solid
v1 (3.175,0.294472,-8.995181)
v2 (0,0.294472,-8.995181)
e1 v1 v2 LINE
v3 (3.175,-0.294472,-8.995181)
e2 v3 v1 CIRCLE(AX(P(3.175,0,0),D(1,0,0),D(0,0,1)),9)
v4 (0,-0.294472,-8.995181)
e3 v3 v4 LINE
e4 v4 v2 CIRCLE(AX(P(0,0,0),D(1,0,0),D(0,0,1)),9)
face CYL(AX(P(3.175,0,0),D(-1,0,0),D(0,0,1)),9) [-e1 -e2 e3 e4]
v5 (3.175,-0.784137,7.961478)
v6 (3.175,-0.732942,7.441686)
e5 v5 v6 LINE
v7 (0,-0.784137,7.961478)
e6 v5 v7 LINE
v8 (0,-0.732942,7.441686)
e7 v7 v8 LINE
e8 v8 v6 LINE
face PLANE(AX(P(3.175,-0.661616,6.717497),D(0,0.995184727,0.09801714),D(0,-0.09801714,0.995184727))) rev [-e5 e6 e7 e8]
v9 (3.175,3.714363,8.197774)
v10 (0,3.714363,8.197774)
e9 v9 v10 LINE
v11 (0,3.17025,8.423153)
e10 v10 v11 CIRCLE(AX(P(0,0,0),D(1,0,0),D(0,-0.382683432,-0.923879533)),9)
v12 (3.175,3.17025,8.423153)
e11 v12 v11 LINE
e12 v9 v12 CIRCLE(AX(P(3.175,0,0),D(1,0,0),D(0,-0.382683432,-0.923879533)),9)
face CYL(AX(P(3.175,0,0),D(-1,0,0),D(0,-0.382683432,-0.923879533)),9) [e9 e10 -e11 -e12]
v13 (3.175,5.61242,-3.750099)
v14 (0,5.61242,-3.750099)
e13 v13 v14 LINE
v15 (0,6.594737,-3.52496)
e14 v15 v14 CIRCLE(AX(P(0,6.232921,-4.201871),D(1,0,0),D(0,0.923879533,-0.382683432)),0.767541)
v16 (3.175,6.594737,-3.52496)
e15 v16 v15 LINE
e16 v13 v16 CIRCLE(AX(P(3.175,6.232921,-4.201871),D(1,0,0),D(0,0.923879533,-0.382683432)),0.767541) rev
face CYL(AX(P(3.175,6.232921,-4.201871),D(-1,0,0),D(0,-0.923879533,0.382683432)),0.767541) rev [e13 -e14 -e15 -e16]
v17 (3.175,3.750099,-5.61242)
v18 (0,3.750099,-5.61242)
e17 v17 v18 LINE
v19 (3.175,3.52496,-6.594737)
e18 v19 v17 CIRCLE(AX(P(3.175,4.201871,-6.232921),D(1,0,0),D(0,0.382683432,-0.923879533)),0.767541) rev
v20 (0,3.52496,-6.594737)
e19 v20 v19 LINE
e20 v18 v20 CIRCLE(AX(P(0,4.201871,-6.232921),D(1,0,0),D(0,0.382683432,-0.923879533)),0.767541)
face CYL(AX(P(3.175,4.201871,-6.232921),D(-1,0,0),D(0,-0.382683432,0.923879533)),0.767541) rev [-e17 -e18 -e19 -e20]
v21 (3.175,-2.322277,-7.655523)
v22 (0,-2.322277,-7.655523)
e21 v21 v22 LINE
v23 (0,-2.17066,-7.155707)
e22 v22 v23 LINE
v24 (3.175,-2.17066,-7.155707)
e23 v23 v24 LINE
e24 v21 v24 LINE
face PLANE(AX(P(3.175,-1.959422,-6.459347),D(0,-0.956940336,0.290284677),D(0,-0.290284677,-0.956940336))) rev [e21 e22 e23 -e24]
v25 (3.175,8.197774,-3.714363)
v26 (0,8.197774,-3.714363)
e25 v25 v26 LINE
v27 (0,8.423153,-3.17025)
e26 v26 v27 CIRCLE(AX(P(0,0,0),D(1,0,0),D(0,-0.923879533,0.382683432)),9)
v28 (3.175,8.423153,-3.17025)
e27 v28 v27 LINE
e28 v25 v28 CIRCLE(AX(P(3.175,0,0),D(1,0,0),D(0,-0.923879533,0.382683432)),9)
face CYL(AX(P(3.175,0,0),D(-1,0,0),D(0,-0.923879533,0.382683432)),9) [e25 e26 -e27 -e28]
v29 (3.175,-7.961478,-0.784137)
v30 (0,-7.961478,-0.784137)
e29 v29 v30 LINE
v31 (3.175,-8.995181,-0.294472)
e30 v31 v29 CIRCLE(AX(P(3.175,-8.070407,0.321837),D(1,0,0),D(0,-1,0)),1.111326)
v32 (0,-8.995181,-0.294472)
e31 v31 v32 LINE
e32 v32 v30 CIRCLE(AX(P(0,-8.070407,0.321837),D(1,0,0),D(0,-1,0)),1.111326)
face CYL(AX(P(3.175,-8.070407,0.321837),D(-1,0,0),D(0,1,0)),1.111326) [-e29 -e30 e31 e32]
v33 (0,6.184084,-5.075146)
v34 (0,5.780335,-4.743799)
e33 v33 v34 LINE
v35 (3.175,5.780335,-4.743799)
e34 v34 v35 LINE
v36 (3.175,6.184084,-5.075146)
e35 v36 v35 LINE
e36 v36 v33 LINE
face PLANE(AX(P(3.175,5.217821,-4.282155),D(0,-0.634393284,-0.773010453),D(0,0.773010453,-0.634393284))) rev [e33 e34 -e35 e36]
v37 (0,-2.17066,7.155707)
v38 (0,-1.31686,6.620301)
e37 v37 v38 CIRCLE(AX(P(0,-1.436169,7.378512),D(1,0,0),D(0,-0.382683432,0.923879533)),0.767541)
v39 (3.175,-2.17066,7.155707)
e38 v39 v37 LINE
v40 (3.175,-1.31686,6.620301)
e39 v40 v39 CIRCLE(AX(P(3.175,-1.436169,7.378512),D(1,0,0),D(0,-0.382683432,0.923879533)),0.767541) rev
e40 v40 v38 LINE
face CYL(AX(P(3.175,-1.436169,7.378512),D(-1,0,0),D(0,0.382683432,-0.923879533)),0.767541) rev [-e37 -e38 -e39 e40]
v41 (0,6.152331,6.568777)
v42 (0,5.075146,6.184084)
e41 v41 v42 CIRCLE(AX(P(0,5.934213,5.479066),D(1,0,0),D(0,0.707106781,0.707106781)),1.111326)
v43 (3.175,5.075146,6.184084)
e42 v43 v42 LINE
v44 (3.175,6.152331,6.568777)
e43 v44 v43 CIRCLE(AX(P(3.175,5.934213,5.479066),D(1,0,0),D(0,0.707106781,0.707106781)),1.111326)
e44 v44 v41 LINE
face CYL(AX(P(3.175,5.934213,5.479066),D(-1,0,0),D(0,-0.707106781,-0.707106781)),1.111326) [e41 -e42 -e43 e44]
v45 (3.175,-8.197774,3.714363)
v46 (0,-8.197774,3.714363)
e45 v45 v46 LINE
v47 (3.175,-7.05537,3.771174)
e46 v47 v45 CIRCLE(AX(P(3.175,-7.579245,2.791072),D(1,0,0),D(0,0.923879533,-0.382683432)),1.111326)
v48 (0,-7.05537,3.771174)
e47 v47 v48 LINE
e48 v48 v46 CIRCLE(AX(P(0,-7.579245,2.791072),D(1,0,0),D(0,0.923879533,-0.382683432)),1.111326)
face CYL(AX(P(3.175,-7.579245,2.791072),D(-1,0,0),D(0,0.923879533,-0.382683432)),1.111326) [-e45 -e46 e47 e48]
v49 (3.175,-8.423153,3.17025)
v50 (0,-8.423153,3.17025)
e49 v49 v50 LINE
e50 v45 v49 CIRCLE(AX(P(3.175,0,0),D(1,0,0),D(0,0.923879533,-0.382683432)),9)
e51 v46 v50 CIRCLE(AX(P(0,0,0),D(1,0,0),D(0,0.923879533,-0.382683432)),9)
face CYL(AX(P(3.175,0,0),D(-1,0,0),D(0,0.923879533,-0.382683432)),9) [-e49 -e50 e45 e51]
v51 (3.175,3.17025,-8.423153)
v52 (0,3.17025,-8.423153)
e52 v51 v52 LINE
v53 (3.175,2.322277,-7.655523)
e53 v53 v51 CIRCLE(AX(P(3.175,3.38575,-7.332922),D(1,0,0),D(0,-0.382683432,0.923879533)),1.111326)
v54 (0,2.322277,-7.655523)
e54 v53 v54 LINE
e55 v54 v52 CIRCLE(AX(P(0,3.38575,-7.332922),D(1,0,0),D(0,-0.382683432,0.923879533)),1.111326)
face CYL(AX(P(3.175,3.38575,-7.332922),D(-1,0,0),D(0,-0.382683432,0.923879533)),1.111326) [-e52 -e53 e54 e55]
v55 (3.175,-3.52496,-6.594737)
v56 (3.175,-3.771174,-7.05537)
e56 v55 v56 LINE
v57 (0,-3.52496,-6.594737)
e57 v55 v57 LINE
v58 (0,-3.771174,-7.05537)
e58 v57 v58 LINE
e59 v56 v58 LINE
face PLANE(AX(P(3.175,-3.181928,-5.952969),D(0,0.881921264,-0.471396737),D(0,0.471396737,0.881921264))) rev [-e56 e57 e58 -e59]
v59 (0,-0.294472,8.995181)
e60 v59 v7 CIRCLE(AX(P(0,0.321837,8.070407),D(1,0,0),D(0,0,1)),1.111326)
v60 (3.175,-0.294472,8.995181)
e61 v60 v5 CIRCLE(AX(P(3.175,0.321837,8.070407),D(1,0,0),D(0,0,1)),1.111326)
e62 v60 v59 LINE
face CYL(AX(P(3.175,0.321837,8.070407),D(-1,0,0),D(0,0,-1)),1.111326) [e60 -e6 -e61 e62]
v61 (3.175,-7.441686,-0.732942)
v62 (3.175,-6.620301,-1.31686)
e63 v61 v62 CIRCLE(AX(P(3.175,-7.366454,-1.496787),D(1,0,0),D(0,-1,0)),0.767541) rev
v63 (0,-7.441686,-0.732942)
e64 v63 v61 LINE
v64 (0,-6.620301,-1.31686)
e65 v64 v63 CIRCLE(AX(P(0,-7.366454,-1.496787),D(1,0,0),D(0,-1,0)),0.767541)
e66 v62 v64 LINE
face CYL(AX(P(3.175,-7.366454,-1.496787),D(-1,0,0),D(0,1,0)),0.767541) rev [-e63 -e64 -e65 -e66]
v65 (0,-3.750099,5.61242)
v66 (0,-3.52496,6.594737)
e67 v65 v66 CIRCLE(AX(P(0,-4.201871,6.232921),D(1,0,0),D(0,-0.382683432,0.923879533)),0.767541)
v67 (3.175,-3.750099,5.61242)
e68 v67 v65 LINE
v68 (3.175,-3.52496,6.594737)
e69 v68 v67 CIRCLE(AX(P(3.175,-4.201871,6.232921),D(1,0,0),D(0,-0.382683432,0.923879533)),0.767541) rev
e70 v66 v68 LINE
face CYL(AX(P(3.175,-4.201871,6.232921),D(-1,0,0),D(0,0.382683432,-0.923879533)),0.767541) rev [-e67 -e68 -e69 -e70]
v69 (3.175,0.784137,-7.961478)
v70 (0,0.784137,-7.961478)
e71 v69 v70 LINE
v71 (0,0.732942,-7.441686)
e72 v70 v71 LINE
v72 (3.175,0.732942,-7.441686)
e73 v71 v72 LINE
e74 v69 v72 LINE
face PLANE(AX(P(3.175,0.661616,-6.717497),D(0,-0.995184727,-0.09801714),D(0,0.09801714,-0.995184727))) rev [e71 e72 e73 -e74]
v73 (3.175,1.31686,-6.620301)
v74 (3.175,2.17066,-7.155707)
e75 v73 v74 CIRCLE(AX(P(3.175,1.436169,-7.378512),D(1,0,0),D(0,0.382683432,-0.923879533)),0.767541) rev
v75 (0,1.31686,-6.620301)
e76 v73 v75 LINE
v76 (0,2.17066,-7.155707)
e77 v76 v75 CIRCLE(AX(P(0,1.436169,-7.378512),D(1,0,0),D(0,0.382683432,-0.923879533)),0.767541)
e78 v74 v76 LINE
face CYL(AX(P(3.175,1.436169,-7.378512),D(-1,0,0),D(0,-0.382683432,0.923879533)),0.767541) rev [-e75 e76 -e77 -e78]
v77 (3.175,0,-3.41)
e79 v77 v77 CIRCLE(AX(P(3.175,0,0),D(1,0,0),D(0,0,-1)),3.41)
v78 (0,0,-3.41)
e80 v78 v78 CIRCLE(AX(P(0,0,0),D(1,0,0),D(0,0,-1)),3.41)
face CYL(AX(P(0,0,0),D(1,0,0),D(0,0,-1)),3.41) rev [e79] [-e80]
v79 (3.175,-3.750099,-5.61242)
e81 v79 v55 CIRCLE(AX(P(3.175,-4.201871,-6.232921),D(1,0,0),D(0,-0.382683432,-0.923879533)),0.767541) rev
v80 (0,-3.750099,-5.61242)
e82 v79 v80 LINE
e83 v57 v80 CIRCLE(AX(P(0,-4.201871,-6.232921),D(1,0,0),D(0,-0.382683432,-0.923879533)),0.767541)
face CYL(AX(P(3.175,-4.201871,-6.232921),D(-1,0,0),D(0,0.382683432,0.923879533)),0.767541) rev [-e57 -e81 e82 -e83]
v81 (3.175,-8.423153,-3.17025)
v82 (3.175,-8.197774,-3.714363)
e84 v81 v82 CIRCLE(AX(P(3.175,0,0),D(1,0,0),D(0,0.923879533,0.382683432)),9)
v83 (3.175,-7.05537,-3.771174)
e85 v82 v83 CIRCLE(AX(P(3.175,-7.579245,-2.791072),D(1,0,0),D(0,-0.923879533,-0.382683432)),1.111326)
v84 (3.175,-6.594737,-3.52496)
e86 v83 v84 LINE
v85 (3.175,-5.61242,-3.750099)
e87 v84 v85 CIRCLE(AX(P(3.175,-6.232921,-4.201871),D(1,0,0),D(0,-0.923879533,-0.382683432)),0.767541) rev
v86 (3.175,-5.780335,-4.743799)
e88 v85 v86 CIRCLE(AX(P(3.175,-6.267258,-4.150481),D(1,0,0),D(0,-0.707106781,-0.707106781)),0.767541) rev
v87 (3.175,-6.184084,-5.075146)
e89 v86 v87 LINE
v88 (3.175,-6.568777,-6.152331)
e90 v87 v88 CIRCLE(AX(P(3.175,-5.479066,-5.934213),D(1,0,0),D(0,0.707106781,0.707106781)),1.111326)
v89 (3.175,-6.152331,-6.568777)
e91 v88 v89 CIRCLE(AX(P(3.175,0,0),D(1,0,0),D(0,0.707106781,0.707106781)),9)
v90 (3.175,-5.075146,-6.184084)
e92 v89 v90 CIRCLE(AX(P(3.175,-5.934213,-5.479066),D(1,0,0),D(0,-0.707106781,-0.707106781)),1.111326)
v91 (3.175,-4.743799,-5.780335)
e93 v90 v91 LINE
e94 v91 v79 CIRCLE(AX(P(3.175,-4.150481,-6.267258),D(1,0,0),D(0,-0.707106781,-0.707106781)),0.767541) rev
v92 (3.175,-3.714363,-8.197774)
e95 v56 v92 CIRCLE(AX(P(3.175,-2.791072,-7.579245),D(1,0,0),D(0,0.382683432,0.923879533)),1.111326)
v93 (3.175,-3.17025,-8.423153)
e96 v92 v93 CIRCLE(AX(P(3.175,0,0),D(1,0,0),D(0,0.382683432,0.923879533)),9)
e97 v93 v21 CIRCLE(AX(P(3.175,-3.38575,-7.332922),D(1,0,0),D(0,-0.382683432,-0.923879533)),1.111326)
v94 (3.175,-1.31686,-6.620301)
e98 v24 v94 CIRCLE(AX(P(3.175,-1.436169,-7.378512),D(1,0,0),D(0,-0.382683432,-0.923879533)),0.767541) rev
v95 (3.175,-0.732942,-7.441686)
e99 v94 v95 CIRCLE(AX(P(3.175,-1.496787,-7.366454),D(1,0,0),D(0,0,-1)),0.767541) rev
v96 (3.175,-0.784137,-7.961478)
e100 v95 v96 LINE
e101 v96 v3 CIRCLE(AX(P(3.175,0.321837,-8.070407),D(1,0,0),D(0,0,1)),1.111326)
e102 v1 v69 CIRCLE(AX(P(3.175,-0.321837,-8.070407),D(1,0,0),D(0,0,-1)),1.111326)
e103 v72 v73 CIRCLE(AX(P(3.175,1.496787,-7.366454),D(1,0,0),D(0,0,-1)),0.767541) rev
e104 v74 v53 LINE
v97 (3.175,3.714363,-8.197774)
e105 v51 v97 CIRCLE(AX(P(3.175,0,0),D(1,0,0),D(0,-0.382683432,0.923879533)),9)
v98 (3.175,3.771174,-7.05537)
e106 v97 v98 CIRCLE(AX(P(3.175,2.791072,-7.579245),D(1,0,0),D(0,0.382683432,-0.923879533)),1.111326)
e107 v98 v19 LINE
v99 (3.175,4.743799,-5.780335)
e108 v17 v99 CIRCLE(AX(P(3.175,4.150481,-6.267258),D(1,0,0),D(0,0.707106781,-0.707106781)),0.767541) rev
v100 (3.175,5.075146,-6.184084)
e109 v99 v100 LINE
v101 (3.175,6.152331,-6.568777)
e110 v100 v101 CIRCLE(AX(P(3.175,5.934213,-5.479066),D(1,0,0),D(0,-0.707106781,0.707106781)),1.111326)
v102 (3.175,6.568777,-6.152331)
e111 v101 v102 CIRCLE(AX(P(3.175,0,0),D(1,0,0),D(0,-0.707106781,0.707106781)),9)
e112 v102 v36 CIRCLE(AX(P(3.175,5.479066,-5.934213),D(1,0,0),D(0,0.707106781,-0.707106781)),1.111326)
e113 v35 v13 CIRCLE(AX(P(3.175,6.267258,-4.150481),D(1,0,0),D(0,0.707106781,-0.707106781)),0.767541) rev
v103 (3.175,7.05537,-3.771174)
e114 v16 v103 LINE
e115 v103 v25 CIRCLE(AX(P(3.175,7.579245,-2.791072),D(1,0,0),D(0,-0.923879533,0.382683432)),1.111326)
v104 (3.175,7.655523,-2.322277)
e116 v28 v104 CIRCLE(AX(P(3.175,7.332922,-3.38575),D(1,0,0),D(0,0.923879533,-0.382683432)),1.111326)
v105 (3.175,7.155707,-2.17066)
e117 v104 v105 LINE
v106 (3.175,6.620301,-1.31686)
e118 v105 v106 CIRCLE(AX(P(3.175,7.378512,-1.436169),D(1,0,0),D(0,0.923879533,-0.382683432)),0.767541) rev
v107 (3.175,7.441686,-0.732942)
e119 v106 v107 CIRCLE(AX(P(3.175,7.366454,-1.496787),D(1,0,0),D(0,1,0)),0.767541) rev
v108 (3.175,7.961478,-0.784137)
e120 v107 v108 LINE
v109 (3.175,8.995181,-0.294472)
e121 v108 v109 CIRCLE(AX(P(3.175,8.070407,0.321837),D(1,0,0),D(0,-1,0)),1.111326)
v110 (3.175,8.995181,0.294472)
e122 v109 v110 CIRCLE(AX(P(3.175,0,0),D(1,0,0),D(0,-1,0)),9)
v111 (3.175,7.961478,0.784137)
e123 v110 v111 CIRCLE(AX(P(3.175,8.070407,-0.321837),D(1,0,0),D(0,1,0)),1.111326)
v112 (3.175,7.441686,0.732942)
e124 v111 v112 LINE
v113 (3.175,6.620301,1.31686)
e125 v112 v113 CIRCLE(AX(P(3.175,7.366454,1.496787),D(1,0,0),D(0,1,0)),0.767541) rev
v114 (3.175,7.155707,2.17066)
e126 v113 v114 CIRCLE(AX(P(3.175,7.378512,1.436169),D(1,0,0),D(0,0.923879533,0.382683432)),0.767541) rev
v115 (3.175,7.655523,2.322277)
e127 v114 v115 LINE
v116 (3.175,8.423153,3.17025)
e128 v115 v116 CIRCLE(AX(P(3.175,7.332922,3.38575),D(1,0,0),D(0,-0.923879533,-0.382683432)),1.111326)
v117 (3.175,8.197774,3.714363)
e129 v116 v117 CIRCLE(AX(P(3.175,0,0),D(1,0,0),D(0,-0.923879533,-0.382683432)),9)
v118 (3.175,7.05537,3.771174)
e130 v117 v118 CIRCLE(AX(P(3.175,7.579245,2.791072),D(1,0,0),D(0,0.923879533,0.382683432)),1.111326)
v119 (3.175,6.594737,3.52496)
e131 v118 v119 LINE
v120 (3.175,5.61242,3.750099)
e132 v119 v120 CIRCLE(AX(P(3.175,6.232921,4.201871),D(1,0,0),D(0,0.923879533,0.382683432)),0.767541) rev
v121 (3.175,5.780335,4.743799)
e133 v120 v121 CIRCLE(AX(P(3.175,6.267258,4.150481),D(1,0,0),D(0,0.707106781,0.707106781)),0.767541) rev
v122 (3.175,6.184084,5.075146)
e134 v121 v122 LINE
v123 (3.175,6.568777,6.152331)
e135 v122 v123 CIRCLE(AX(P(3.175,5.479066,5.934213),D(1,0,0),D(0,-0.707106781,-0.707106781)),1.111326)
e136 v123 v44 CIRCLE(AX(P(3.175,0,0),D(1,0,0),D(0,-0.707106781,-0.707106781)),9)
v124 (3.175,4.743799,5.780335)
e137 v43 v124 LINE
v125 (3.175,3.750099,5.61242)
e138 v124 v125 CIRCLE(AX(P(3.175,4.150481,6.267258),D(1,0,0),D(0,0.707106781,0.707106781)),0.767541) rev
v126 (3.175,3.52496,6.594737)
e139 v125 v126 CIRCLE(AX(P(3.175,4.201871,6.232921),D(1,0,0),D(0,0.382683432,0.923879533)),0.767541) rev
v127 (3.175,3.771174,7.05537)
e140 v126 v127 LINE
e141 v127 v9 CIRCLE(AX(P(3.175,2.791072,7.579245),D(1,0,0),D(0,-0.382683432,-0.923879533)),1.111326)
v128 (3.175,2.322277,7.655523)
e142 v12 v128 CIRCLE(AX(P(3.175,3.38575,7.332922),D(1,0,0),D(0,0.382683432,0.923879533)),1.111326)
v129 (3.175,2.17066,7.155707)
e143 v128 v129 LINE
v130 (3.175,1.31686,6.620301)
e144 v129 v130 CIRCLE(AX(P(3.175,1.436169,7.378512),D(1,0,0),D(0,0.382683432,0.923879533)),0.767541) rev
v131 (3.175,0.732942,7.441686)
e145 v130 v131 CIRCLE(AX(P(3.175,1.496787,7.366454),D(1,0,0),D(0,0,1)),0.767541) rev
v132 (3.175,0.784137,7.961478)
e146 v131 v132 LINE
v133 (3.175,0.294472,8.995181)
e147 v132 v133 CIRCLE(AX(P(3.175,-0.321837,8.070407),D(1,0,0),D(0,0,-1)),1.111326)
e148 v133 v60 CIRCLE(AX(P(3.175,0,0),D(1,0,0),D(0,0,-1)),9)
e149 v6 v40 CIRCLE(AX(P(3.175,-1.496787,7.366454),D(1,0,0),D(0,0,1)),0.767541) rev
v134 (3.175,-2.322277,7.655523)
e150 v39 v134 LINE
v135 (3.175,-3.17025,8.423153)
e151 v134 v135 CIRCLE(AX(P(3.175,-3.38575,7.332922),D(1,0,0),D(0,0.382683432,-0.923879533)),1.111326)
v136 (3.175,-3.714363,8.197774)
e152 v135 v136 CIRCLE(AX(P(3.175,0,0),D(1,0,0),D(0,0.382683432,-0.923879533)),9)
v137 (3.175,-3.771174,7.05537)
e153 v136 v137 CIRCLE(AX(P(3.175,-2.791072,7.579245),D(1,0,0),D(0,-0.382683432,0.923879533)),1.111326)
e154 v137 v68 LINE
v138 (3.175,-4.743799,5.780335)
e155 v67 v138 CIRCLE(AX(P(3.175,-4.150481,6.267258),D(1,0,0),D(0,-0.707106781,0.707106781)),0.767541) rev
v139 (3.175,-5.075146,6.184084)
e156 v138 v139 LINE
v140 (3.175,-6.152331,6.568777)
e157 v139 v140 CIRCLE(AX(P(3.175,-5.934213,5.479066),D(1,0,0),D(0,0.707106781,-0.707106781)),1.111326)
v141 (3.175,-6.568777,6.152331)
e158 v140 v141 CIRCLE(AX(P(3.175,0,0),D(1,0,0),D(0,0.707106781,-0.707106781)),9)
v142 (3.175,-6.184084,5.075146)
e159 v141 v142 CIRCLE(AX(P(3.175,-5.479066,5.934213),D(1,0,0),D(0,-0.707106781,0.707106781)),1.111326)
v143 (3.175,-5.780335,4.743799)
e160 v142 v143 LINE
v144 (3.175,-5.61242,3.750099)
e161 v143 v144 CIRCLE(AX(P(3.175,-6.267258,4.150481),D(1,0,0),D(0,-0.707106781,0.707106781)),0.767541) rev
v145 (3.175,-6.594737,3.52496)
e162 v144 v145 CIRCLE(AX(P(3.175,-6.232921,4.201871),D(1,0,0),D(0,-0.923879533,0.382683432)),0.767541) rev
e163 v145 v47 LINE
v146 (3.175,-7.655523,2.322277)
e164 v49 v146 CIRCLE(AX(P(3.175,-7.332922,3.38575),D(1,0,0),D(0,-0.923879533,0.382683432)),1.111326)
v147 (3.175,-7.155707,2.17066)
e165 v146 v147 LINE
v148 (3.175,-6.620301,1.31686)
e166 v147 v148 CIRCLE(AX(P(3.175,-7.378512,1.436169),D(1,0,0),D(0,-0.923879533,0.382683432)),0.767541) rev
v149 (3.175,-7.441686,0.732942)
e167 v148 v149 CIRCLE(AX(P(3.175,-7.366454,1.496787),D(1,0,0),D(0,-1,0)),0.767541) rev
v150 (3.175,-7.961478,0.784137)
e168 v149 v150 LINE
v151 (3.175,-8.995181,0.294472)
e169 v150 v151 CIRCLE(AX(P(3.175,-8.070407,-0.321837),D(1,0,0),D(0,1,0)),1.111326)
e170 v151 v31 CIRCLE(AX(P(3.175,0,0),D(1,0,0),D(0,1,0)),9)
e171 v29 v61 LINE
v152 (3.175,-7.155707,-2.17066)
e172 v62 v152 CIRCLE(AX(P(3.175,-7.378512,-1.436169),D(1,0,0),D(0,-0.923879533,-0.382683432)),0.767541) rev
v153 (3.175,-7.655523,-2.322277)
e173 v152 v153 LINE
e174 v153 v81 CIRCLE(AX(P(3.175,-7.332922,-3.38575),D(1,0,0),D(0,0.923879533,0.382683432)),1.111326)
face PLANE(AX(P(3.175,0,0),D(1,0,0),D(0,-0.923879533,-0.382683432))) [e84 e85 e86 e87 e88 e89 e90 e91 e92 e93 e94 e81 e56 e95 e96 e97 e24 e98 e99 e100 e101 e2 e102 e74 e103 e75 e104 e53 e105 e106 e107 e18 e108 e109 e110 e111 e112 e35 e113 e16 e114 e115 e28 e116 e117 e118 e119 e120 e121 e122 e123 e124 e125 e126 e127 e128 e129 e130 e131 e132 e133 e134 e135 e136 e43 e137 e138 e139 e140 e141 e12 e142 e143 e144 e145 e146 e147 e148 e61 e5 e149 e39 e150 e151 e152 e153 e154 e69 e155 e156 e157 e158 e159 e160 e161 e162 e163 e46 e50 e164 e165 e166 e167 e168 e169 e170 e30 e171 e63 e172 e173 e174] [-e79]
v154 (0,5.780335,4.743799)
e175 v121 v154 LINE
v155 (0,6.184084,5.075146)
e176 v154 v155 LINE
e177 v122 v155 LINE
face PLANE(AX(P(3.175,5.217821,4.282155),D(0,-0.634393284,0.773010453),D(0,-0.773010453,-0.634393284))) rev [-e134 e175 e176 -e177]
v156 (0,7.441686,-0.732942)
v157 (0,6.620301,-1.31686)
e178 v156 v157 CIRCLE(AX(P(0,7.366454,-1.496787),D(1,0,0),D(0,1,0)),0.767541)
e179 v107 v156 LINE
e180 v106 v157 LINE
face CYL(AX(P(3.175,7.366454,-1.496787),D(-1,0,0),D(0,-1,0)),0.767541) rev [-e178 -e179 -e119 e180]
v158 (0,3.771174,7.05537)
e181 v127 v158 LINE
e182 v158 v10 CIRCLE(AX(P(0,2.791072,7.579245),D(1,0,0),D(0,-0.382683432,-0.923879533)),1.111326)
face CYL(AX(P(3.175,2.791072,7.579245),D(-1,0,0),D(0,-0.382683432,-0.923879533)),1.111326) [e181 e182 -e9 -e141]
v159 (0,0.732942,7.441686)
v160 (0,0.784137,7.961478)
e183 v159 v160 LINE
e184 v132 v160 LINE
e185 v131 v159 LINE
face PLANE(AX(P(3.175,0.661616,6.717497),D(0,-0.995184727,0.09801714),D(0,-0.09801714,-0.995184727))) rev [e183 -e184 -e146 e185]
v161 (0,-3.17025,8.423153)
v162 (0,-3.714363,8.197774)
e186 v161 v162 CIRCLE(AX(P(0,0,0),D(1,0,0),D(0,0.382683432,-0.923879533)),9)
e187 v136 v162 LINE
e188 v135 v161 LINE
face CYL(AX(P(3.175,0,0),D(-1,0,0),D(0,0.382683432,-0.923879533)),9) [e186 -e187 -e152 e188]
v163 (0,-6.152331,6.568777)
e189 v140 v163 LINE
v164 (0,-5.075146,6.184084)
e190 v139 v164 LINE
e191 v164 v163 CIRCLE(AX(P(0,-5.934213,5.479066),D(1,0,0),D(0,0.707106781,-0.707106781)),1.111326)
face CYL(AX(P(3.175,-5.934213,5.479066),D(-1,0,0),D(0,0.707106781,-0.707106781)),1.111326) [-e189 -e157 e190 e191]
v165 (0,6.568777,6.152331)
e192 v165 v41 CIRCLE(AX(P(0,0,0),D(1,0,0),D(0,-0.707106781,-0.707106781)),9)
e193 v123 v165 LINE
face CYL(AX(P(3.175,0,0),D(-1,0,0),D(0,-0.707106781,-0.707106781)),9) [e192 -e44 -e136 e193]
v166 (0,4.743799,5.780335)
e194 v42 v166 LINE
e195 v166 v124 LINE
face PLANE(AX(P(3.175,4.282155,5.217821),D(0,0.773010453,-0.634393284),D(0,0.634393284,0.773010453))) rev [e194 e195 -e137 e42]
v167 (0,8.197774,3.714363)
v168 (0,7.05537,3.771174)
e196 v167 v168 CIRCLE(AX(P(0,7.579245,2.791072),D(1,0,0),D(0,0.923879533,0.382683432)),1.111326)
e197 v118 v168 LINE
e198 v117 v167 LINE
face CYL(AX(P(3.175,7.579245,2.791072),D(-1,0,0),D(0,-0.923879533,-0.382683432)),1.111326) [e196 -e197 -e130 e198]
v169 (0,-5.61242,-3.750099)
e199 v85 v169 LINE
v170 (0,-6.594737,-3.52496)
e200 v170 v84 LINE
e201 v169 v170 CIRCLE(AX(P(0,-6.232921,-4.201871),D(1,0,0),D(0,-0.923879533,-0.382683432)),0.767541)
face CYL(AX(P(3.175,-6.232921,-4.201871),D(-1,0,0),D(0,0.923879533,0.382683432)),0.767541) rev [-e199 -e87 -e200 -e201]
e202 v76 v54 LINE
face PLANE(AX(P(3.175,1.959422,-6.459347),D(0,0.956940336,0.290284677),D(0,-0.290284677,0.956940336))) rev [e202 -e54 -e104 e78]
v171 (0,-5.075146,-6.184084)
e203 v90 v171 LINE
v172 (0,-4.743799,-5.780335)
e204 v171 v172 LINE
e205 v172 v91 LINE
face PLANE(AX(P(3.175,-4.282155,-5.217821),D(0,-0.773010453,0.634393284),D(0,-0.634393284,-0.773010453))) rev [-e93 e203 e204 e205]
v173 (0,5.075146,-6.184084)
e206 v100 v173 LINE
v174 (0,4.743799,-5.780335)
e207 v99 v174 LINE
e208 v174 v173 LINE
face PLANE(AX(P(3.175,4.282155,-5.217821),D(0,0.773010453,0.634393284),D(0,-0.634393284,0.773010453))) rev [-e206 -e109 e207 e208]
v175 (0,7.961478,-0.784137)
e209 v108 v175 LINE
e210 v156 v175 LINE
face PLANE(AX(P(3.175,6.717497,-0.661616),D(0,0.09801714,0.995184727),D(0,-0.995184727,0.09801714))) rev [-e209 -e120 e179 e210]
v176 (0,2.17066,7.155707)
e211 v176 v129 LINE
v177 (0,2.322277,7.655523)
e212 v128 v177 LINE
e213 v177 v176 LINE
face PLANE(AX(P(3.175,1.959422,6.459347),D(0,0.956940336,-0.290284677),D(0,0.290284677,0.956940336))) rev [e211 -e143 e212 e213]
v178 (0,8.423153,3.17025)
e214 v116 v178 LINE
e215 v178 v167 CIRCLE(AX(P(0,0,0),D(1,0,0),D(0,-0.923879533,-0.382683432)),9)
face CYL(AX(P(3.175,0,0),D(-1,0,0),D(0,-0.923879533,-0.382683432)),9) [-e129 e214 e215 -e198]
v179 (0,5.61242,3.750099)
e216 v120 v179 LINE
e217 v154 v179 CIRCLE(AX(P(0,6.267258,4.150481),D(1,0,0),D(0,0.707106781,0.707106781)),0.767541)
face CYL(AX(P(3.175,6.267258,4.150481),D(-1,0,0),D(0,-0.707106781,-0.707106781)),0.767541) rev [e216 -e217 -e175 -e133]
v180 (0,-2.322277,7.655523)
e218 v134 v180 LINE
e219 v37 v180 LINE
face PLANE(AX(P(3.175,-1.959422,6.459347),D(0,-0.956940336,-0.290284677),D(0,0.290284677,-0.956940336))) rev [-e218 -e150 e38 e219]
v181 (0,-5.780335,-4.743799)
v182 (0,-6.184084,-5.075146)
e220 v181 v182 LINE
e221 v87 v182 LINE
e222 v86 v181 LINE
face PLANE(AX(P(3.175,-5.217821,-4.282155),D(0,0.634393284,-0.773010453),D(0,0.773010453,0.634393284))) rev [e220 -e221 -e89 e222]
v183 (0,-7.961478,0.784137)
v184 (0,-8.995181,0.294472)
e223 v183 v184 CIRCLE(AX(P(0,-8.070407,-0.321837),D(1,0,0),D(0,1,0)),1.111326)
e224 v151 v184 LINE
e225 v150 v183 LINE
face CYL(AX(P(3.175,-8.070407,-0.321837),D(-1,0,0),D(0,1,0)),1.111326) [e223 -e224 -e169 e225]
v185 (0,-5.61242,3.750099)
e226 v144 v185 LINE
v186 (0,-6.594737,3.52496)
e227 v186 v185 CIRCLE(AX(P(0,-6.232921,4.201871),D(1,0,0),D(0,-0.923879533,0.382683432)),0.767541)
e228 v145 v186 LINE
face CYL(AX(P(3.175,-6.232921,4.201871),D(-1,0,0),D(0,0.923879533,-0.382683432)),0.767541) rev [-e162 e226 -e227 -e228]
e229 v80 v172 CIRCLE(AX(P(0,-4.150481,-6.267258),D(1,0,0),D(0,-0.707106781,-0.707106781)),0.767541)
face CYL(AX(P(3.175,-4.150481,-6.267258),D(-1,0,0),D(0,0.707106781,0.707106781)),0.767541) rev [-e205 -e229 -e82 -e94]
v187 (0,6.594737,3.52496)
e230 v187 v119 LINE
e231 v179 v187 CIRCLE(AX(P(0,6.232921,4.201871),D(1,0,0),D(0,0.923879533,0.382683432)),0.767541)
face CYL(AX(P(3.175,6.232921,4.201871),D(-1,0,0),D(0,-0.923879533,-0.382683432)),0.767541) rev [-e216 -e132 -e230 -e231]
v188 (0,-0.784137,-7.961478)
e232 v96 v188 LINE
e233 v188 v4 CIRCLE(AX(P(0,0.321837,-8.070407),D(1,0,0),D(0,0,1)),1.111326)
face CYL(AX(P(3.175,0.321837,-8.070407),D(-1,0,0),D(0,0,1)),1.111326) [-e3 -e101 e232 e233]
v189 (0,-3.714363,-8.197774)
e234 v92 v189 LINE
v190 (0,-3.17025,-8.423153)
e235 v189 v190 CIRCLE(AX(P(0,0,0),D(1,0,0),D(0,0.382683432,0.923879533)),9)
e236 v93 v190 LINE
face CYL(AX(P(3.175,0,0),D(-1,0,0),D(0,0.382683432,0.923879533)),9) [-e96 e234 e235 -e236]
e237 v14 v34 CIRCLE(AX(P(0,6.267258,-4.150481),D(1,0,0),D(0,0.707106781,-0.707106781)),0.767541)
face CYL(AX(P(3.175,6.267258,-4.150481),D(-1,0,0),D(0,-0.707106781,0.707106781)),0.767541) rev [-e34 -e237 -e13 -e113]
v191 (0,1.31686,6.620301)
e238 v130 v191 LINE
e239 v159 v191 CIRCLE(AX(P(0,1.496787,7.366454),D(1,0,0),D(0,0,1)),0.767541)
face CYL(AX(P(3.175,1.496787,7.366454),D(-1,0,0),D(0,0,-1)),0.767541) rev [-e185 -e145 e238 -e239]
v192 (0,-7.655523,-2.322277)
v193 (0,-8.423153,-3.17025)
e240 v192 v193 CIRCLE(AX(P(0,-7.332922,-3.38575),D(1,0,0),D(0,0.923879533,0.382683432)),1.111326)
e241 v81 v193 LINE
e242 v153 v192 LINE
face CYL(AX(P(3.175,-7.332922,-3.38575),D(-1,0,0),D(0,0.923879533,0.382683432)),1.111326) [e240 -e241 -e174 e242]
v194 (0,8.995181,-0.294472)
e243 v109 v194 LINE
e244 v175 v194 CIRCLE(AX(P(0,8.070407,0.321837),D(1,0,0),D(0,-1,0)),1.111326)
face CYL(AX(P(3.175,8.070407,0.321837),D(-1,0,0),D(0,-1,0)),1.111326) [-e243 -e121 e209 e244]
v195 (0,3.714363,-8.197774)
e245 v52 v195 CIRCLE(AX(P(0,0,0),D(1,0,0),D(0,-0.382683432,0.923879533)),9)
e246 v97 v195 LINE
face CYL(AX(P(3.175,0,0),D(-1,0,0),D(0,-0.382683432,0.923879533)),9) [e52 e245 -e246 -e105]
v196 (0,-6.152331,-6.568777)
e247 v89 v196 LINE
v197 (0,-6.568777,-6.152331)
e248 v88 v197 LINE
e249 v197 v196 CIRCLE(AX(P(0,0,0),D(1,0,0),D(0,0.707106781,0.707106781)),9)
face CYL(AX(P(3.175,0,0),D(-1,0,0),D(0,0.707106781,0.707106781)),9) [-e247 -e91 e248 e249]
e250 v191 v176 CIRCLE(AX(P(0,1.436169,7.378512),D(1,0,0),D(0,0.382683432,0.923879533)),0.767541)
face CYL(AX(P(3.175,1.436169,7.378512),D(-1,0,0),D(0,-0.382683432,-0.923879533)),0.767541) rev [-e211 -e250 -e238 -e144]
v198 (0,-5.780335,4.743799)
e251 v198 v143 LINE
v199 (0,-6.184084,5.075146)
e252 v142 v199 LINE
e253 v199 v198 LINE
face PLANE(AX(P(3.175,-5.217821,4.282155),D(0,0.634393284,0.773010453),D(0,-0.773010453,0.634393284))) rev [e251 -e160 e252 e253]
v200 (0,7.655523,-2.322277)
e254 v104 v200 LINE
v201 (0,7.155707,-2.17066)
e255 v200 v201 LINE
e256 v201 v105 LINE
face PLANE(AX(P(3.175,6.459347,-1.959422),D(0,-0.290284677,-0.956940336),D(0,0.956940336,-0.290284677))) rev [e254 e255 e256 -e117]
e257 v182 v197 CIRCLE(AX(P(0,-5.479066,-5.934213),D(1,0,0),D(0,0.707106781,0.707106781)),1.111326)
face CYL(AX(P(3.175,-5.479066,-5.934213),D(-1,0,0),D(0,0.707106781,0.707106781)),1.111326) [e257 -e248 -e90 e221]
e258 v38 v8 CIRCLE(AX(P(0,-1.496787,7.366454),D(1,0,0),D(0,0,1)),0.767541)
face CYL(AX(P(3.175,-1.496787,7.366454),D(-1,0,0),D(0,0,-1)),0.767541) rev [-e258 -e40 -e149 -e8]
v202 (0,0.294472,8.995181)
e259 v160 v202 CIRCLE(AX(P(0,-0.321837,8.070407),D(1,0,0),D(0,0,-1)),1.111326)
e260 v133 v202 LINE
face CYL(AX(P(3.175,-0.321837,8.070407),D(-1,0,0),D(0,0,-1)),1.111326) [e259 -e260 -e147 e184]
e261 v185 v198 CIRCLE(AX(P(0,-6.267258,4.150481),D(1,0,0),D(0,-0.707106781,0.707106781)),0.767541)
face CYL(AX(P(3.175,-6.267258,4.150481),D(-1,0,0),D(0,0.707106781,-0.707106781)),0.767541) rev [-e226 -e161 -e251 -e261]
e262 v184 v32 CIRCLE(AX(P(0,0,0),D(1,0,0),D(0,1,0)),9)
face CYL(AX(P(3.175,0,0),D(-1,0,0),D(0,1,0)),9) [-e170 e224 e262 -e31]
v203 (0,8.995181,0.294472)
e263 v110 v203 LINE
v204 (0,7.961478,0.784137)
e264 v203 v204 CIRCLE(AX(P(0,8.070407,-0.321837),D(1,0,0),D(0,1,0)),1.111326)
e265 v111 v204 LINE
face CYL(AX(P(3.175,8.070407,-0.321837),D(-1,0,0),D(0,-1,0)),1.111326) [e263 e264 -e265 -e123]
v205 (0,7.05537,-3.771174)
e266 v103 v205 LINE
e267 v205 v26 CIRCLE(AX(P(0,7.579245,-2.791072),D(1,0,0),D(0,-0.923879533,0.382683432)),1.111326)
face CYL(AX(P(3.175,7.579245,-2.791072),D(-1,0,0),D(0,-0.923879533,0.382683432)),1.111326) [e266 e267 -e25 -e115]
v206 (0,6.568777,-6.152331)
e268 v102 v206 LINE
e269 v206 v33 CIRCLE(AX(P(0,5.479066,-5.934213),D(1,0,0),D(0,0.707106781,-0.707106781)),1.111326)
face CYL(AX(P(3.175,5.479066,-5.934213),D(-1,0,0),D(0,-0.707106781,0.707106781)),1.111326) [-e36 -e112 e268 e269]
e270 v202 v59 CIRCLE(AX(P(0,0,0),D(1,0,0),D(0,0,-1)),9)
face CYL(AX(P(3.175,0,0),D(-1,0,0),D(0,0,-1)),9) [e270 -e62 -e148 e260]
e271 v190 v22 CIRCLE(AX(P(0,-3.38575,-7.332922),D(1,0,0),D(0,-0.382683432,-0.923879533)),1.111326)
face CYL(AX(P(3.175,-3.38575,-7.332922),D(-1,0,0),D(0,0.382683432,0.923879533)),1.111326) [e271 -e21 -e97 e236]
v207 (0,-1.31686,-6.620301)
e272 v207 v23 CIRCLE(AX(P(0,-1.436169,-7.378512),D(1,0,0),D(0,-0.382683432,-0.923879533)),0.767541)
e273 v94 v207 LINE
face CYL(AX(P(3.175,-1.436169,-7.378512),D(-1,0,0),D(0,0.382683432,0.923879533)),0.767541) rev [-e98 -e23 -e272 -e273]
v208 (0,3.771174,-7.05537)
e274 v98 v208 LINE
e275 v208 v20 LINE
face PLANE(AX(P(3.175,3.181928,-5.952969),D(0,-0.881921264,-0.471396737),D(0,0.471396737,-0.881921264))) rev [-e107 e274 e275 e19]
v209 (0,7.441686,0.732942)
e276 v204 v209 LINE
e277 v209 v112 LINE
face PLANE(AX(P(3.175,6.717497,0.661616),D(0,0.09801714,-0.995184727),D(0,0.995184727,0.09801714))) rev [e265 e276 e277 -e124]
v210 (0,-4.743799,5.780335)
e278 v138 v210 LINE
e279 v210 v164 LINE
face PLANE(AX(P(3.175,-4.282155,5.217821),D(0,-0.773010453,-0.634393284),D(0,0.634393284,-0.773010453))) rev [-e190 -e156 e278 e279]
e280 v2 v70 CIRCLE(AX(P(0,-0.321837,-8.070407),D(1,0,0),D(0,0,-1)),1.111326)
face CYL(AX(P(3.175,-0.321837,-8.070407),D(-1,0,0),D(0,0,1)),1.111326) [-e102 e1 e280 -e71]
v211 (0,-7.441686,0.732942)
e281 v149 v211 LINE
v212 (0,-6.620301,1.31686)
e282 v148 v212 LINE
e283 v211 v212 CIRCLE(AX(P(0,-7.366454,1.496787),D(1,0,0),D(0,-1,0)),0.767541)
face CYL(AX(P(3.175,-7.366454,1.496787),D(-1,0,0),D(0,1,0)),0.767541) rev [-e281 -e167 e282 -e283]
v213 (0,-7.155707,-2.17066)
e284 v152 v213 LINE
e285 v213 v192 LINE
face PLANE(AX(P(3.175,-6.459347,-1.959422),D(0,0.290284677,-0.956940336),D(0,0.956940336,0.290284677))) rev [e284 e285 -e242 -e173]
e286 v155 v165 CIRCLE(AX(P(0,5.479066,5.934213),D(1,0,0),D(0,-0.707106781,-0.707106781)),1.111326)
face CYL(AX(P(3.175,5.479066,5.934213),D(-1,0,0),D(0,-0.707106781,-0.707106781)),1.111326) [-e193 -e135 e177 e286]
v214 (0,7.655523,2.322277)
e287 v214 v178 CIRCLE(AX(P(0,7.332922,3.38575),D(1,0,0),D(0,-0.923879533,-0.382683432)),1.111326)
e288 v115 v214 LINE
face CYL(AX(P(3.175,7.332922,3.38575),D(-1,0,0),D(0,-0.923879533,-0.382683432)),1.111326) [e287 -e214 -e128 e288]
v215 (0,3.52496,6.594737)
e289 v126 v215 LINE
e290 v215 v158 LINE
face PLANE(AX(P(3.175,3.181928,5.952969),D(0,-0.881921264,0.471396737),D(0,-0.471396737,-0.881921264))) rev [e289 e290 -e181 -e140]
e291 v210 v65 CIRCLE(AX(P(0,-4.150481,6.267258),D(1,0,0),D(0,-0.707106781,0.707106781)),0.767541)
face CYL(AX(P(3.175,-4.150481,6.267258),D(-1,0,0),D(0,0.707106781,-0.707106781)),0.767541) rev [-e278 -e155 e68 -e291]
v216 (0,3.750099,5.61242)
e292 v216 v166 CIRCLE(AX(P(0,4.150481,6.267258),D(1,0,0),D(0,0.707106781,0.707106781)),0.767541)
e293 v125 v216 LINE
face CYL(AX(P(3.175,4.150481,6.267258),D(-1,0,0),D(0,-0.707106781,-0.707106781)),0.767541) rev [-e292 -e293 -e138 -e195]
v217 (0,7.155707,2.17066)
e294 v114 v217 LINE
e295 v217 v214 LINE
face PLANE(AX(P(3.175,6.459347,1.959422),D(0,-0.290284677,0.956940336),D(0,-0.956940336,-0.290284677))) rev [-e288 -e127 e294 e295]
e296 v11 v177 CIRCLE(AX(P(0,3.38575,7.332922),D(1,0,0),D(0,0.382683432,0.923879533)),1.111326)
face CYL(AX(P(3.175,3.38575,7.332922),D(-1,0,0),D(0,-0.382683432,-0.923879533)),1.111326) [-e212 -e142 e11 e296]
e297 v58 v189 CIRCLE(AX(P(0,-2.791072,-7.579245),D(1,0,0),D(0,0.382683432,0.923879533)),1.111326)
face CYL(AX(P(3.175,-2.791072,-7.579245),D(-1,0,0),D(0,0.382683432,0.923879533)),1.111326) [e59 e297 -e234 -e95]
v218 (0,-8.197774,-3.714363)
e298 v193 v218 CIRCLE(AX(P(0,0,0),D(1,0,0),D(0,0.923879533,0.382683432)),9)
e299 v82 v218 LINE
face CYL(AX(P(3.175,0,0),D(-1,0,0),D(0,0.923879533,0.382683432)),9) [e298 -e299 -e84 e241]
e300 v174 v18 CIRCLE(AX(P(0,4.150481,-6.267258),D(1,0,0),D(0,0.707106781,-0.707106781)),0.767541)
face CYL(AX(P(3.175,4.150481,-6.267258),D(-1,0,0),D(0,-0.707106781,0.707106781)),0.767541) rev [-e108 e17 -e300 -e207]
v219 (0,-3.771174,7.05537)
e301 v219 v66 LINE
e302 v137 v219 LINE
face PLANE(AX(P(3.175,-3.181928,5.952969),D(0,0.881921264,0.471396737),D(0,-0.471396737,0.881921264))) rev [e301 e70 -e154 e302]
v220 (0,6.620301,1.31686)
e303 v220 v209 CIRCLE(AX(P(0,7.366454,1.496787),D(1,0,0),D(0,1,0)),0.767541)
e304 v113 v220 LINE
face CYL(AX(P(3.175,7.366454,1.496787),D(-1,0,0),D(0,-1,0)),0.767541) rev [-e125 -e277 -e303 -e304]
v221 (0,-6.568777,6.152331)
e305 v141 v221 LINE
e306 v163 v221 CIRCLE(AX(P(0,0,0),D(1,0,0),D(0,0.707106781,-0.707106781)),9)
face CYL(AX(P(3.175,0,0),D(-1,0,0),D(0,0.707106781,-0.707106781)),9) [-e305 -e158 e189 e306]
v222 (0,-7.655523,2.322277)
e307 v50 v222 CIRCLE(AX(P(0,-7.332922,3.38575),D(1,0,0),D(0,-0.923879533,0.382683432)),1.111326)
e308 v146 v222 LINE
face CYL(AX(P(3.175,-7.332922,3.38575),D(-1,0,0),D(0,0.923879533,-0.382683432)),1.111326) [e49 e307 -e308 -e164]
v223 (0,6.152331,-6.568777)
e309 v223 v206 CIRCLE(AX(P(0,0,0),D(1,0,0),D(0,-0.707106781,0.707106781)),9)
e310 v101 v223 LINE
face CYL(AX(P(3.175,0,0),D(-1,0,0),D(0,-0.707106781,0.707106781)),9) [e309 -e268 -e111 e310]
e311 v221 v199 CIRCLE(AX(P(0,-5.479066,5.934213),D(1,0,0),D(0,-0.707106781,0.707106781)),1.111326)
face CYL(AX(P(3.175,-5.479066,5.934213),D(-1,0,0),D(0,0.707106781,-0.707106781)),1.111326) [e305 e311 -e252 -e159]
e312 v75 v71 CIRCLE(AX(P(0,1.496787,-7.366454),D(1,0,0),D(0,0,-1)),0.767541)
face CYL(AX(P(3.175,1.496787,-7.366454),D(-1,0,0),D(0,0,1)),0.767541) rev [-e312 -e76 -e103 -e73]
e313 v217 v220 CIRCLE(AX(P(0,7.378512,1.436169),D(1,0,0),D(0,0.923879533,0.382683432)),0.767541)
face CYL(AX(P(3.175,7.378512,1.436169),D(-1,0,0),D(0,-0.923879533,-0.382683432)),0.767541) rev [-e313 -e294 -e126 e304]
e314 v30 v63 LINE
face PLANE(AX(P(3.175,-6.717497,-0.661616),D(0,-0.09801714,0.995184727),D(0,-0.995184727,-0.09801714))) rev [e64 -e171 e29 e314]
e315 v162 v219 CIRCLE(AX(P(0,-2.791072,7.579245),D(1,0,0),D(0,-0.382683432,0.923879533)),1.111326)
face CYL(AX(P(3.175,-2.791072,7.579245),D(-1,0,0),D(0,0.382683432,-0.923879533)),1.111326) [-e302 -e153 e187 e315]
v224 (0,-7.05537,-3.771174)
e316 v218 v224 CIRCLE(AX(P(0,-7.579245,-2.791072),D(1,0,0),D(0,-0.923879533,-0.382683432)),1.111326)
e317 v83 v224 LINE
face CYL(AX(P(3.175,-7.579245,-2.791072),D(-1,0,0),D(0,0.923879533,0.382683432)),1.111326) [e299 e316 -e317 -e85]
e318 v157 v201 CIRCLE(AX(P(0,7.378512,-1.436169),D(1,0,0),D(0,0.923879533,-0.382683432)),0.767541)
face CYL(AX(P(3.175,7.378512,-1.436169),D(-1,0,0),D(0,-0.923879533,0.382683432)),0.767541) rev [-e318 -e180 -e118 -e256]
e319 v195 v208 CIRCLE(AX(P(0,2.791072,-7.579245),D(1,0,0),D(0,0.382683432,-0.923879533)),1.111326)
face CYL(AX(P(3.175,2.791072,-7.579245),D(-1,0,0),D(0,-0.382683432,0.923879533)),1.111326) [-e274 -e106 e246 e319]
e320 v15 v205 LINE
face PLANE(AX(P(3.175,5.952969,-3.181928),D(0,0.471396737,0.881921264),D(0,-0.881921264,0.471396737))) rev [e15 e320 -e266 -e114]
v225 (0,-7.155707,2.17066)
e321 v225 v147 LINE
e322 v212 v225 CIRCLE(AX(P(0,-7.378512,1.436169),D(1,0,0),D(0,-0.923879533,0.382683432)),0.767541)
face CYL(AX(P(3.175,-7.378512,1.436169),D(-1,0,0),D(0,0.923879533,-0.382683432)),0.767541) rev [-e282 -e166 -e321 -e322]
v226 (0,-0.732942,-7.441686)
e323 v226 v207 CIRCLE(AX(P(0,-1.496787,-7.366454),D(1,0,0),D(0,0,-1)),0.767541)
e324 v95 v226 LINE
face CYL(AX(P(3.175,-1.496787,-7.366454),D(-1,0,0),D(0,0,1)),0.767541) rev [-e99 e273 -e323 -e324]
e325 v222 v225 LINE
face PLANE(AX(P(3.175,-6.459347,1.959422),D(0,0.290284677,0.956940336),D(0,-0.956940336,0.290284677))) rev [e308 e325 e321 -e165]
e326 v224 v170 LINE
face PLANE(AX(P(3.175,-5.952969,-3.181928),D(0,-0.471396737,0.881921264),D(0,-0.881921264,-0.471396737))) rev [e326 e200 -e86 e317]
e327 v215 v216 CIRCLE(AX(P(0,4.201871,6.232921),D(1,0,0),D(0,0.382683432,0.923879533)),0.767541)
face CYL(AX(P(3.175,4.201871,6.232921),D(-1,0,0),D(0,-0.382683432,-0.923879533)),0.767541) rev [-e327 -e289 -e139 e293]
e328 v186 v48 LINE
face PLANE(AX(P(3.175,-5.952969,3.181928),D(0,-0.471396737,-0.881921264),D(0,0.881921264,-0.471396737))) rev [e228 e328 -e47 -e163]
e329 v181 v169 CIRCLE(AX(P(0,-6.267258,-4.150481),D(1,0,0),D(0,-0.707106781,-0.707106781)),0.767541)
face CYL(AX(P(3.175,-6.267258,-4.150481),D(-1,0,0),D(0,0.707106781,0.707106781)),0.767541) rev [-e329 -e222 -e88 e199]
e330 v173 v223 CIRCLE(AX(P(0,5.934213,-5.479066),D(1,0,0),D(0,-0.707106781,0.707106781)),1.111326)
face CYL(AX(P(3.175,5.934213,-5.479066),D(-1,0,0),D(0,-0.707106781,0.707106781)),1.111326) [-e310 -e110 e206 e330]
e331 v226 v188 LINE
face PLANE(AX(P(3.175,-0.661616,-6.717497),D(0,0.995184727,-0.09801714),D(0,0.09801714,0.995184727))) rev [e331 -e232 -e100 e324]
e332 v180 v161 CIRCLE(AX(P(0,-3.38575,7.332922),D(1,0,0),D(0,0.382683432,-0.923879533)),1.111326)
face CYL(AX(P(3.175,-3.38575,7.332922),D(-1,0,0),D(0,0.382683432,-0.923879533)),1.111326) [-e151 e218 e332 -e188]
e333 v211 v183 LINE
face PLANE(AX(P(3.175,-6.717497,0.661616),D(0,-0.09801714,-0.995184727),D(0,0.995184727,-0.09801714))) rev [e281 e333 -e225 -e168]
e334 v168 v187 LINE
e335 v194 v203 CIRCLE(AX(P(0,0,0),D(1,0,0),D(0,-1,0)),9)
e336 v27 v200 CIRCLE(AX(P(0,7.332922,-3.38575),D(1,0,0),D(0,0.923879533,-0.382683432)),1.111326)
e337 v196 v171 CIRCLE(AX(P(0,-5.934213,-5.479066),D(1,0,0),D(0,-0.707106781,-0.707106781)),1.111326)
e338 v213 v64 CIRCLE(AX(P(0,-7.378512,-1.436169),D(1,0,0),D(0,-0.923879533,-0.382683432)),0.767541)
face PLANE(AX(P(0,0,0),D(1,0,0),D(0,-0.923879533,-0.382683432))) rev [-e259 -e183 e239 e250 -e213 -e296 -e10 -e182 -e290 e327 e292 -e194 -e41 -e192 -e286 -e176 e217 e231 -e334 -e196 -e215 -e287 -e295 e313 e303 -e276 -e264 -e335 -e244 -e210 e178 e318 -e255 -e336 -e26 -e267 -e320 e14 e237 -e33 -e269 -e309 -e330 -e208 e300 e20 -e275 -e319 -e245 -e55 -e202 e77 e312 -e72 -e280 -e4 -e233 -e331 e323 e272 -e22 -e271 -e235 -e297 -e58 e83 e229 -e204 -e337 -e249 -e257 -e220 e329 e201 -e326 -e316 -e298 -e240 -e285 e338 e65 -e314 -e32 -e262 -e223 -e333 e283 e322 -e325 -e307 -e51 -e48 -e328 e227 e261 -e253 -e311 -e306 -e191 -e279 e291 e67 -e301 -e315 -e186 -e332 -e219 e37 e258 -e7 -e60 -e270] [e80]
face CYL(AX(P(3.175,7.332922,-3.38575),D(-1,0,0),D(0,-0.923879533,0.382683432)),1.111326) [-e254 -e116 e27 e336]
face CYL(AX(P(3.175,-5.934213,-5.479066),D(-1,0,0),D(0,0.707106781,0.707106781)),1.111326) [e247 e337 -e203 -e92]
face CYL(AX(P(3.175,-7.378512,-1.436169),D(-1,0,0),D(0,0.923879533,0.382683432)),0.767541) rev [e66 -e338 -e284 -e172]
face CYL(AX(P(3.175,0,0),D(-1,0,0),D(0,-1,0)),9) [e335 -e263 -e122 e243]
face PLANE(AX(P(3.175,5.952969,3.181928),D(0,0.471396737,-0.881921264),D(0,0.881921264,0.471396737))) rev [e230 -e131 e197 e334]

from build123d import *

# Parameters (mm, degrees)
BOSS_EXTRUDE2_DEPTH = 3.175
FILLET1_R           = 0.767540966
CIRPATTERN1_COUNT   = 16
SKETCH2_R           = 3.41
CUT_EXTRUDE1_DEPTH  = 14.117950488


with BuildPart() as part:
    # Sketch1 → Boss-Extrude2 (new body)
    with BuildSketch(Plane(origin=(0, 0, 0), x_dir=(0, 0, -1), z_dir=(1, 0, 0))):
        with BuildLine():
            Line((6.717496905, 0.661615697), (7.961477813, 0.784137123))
            ThreePointArc((7.961477813, 0.784137123), (8.546163052, 0.682503707), (8.995181287, 0.294471745))
            ThreePointArc((8.995181287, 0.294471745), (9, 0), (8.995181287, -0.294471745))
            ThreePointArc((8.995181287, -0.294471745), (8.546163052, -0.682503707), (7.961477813, -0.784137123))
            Line((7.961477813, -0.784137123), (6.717496905, -0.661615697))
            ThreePointArc((6.717496905, -0.661615697), (6.676941442, -0.990430703), (6.620300643, -1.316859674))
            Line((6.620300643, -1.316859674), (0, 0))
            Line((0, 0), (6.620300643, 1.316859674))
            ThreePointArc((6.620300643, 1.316859674), (6.676941442, 0.990430703), (6.717496905, 0.661615697))
        make_face()
    extrude(amount=BOSS_EXTRUDE2_DEPTH)

    # Fillet1
    # the kernel refuses this fillet: 0.767540966 mm, written as the material it adds along each edge
    with BuildSketch(Plane(origin=(0, 0.661615697, -6.717496905), x_dir=(0, 0.9888733768354266, 0.14875968736892464), z_dir=(1, 0, 0))) as fillet1_piece_1_section:
        with BuildLine():
            CenterArc((0.729311441, -0.766537545), FILLET1_R, 92.930055473, 84.139889054)
            Line((-0.037226104, -0.727303285), (0, 0))
            ThreePointArc((0, 0), (0.345038591, -0.008824407), (0.690077182, 0))
        make_face()
    fillet1_piece_1 = extrude(amount=3.175, mode=Mode.PRIVATE)
    fillet1_piece_1 = split(fillet1_piece_1, bisect_by=Plane(origin=(1.5875, 1.34516519, -6.762602082), z_dir=(0, -0.9807852804032304, -0.19509032201612872)), keep=Keep.TOP, mode=Mode.PRIVATE)
    add(fillet1_piece_1)
    with BuildSketch(Plane(origin=(0, -0.661615697, -6.717496905), x_dir=(0, -0.09801714032956141, -0.9951847266721968), z_dir=(1, 0, 0))) as fillet1_piece_2_section:
        with BuildLine():
            CenterArc((0.728255348, -0.767540966), FILLET1_R, 90, 84.139889054)
            ThreePointArc((-0.035274557, -0.68917503), (-0.008824407, -0.345038591), (0, 0))
            Line((0, 0), (0.728255348, 0))
        make_face()
    fillet1_piece_2 = extrude(amount=3.175, mode=Mode.PRIVATE)
    fillet1_piece_2 = split(fillet1_piece_2, bisect_by=Plane(origin=(1.5875, -1.34516519, -6.762602082), z_dir=(0, 0.9807852804032304, -0.19509032201612872)), keep=Keep.TOP, mode=Mode.PRIVATE)
    add(fillet1_piece_2)


with BuildPart() as cirpattern1_1:
    # CirPattern1: pattern copy
    add(part.part.rotate(Axis((0, 0, 0), (1, 0, 0)), 1 * 360 / CIRPATTERN1_COUNT))


with BuildPart() as cirpattern1_2:
    # CirPattern1: pattern copy
    add(part.part.rotate(Axis((0, 0, 0), (1, 0, 0)), 2 * 360 / CIRPATTERN1_COUNT))


with BuildPart() as cirpattern1_3:
    # CirPattern1: pattern copy
    add(part.part.rotate(Axis((0, 0, 0), (1, 0, 0)), 3 * 360 / CIRPATTERN1_COUNT))


with BuildPart() as cirpattern1_4:
    # CirPattern1: pattern copy
    add(part.part.rotate(Axis((0, 0, 0), (1, 0, 0)), 4 * 360 / CIRPATTERN1_COUNT))


with BuildPart() as cirpattern1_5:
    # CirPattern1: pattern copy
    add(part.part.rotate(Axis((0, 0, 0), (1, 0, 0)), 5 * 360 / CIRPATTERN1_COUNT))


with BuildPart() as cirpattern1_6:
    # CirPattern1: pattern copy
    add(part.part.rotate(Axis((0, 0, 0), (1, 0, 0)), 6 * 360 / CIRPATTERN1_COUNT))


with BuildPart() as cirpattern1_7:
    # CirPattern1: pattern copy
    add(part.part.rotate(Axis((0, 0, 0), (1, 0, 0)), 7 * 360 / CIRPATTERN1_COUNT))


with BuildPart() as cirpattern1_8:
    # CirPattern1: pattern copy
    add(part.part.rotate(Axis((0, 0, 0), (1, 0, 0)), 8 * 360 / CIRPATTERN1_COUNT))


with BuildPart() as cirpattern1_9:
    # CirPattern1: pattern copy
    add(part.part.rotate(Axis((0, 0, 0), (1, 0, 0)), 9 * 360 / CIRPATTERN1_COUNT))


with BuildPart() as cirpattern1_10:
    # CirPattern1: pattern copy
    add(part.part.rotate(Axis((0, 0, 0), (1, 0, 0)), 10 * 360 / CIRPATTERN1_COUNT))


with BuildPart() as cirpattern1_11:
    # CirPattern1: pattern copy
    add(part.part.rotate(Axis((0, 0, 0), (1, 0, 0)), 11 * 360 / CIRPATTERN1_COUNT))


with BuildPart() as cirpattern1_12:
    # CirPattern1: pattern copy
    add(part.part.rotate(Axis((0, 0, 0), (1, 0, 0)), 12 * 360 / CIRPATTERN1_COUNT))


with BuildPart() as cirpattern1_13:
    # CirPattern1: pattern copy
    add(part.part.rotate(Axis((0, 0, 0), (1, 0, 0)), 13 * 360 / CIRPATTERN1_COUNT))


with BuildPart() as cirpattern1_14:
    # CirPattern1: pattern copy
    add(part.part.rotate(Axis((0, 0, 0), (1, 0, 0)), 14 * 360 / CIRPATTERN1_COUNT))


with BuildPart() as cirpattern1_15:
    # CirPattern1: pattern copy
    add(part.part.rotate(Axis((0, 0, 0), (1, 0, 0)), 15 * 360 / CIRPATTERN1_COUNT))


with BuildPart() as cut_extrude1_tool:
    # Sketch2 → Cut-Extrude1 (new, through all)
    with BuildSketch(Plane(origin=(3.175, 0, 0), x_dir=(0, 0, -1), z_dir=(1, 0, 0))):
        Circle(SKETCH2_R)
    extrude(amount=-CUT_EXTRUDE1_DEPTH)


with BuildPart() as part_1:
    add(part.part)

    # Cut-Extrude1: cut by cut_extrude1_tool
    add(cut_extrude1_tool.part, mode=Mode.SUBTRACT)


with BuildPart() as cirpattern1_1_1:
    add(cirpattern1_1.part)

    # Cut-Extrude1: cut by cut_extrude1_tool
    add(cut_extrude1_tool.part, mode=Mode.SUBTRACT)


with BuildPart() as cirpattern1_2_1:
    add(cirpattern1_2.part)

    # Cut-Extrude1: cut by cut_extrude1_tool
    add(cut_extrude1_tool.part, mode=Mode.SUBTRACT)


with BuildPart() as cirpattern1_3_1:
    add(cirpattern1_3.part)

    # Cut-Extrude1: cut by cut_extrude1_tool
    add(cut_extrude1_tool.part, mode=Mode.SUBTRACT)


with BuildPart() as cirpattern1_4_1:
    add(cirpattern1_4.part)

    # Cut-Extrude1: cut by cut_extrude1_tool
    add(cut_extrude1_tool.part, mode=Mode.SUBTRACT)


with BuildPart() as cirpattern1_5_1:
    add(cirpattern1_5.part)

    # Cut-Extrude1: cut by cut_extrude1_tool
    add(cut_extrude1_tool.part, mode=Mode.SUBTRACT)


with BuildPart() as cirpattern1_6_1:
    add(cirpattern1_6.part)

    # Cut-Extrude1: cut by cut_extrude1_tool
    add(cut_extrude1_tool.part, mode=Mode.SUBTRACT)


with BuildPart() as cirpattern1_7_1:
    add(cirpattern1_7.part)

    # Cut-Extrude1: cut by cut_extrude1_tool
    add(cut_extrude1_tool.part, mode=Mode.SUBTRACT)


with BuildPart() as cirpattern1_8_1:
    add(cirpattern1_8.part)

    # Cut-Extrude1: cut by cut_extrude1_tool
    add(cut_extrude1_tool.part, mode=Mode.SUBTRACT)


with BuildPart() as cirpattern1_9_1:
    add(cirpattern1_9.part)

    # Cut-Extrude1: cut by cut_extrude1_tool
    add(cut_extrude1_tool.part, mode=Mode.SUBTRACT)


with BuildPart() as cirpattern1_10_1:
    add(cirpattern1_10.part)

    # Cut-Extrude1: cut by cut_extrude1_tool
    add(cut_extrude1_tool.part, mode=Mode.SUBTRACT)


with BuildPart() as cirpattern1_11_1:
    add(cirpattern1_11.part)

    # Cut-Extrude1: cut by cut_extrude1_tool
    add(cut_extrude1_tool.part, mode=Mode.SUBTRACT)


with BuildPart() as cirpattern1_12_1:
    add(cirpattern1_12.part)

    # Cut-Extrude1: cut by cut_extrude1_tool
    add(cut_extrude1_tool.part, mode=Mode.SUBTRACT)


with BuildPart() as cirpattern1_13_1:
    add(cirpattern1_13.part)

    # Cut-Extrude1: cut by cut_extrude1_tool
    add(cut_extrude1_tool.part, mode=Mode.SUBTRACT)


with BuildPart() as cirpattern1_14_1:
    add(cirpattern1_14.part)

    # Cut-Extrude1: cut by cut_extrude1_tool
    add(cut_extrude1_tool.part, mode=Mode.SUBTRACT)


with BuildPart() as cirpattern1_15_1:
    add(cirpattern1_15.part)

    # Cut-Extrude1: cut by cut_extrude1_tool
    add(cut_extrude1_tool.part, mode=Mode.SUBTRACT)


with BuildPart() as cirpattern1_13_2:
    add(cirpattern1_13_1.part)

    # Combine1: union CirPattern1_1, CirPattern1_14, CirPattern1_2, CirPattern1_15, CirPattern1_3, part, CirPattern1_4, CirPattern1_5, CirPattern1_6, CirPattern1_7, CirPattern1_8, CirPattern1_9, CirPattern1_10, CirPattern1_11, CirPattern1_12
    add(cirpattern1_1_1.part)
    add(cirpattern1_14_1.part)
    add(cirpattern1_2_1.part)
    add(cirpattern1_15_1.part)
    add(cirpattern1_3_1.part)
    add(part_1.part)
    add(cirpattern1_4_1.part)
    add(cirpattern1_5_1.part)
    add(cirpattern1_6_1.part)
    add(cirpattern1_7_1.part)
    add(cirpattern1_8_1.part)
    add(cirpattern1_9_1.part)
    add(cirpattern1_10_1.part)
    add(cirpattern1_11_1.part)
    add(cirpattern1_12_1.part)


solid = cirpattern1_13_2.part
